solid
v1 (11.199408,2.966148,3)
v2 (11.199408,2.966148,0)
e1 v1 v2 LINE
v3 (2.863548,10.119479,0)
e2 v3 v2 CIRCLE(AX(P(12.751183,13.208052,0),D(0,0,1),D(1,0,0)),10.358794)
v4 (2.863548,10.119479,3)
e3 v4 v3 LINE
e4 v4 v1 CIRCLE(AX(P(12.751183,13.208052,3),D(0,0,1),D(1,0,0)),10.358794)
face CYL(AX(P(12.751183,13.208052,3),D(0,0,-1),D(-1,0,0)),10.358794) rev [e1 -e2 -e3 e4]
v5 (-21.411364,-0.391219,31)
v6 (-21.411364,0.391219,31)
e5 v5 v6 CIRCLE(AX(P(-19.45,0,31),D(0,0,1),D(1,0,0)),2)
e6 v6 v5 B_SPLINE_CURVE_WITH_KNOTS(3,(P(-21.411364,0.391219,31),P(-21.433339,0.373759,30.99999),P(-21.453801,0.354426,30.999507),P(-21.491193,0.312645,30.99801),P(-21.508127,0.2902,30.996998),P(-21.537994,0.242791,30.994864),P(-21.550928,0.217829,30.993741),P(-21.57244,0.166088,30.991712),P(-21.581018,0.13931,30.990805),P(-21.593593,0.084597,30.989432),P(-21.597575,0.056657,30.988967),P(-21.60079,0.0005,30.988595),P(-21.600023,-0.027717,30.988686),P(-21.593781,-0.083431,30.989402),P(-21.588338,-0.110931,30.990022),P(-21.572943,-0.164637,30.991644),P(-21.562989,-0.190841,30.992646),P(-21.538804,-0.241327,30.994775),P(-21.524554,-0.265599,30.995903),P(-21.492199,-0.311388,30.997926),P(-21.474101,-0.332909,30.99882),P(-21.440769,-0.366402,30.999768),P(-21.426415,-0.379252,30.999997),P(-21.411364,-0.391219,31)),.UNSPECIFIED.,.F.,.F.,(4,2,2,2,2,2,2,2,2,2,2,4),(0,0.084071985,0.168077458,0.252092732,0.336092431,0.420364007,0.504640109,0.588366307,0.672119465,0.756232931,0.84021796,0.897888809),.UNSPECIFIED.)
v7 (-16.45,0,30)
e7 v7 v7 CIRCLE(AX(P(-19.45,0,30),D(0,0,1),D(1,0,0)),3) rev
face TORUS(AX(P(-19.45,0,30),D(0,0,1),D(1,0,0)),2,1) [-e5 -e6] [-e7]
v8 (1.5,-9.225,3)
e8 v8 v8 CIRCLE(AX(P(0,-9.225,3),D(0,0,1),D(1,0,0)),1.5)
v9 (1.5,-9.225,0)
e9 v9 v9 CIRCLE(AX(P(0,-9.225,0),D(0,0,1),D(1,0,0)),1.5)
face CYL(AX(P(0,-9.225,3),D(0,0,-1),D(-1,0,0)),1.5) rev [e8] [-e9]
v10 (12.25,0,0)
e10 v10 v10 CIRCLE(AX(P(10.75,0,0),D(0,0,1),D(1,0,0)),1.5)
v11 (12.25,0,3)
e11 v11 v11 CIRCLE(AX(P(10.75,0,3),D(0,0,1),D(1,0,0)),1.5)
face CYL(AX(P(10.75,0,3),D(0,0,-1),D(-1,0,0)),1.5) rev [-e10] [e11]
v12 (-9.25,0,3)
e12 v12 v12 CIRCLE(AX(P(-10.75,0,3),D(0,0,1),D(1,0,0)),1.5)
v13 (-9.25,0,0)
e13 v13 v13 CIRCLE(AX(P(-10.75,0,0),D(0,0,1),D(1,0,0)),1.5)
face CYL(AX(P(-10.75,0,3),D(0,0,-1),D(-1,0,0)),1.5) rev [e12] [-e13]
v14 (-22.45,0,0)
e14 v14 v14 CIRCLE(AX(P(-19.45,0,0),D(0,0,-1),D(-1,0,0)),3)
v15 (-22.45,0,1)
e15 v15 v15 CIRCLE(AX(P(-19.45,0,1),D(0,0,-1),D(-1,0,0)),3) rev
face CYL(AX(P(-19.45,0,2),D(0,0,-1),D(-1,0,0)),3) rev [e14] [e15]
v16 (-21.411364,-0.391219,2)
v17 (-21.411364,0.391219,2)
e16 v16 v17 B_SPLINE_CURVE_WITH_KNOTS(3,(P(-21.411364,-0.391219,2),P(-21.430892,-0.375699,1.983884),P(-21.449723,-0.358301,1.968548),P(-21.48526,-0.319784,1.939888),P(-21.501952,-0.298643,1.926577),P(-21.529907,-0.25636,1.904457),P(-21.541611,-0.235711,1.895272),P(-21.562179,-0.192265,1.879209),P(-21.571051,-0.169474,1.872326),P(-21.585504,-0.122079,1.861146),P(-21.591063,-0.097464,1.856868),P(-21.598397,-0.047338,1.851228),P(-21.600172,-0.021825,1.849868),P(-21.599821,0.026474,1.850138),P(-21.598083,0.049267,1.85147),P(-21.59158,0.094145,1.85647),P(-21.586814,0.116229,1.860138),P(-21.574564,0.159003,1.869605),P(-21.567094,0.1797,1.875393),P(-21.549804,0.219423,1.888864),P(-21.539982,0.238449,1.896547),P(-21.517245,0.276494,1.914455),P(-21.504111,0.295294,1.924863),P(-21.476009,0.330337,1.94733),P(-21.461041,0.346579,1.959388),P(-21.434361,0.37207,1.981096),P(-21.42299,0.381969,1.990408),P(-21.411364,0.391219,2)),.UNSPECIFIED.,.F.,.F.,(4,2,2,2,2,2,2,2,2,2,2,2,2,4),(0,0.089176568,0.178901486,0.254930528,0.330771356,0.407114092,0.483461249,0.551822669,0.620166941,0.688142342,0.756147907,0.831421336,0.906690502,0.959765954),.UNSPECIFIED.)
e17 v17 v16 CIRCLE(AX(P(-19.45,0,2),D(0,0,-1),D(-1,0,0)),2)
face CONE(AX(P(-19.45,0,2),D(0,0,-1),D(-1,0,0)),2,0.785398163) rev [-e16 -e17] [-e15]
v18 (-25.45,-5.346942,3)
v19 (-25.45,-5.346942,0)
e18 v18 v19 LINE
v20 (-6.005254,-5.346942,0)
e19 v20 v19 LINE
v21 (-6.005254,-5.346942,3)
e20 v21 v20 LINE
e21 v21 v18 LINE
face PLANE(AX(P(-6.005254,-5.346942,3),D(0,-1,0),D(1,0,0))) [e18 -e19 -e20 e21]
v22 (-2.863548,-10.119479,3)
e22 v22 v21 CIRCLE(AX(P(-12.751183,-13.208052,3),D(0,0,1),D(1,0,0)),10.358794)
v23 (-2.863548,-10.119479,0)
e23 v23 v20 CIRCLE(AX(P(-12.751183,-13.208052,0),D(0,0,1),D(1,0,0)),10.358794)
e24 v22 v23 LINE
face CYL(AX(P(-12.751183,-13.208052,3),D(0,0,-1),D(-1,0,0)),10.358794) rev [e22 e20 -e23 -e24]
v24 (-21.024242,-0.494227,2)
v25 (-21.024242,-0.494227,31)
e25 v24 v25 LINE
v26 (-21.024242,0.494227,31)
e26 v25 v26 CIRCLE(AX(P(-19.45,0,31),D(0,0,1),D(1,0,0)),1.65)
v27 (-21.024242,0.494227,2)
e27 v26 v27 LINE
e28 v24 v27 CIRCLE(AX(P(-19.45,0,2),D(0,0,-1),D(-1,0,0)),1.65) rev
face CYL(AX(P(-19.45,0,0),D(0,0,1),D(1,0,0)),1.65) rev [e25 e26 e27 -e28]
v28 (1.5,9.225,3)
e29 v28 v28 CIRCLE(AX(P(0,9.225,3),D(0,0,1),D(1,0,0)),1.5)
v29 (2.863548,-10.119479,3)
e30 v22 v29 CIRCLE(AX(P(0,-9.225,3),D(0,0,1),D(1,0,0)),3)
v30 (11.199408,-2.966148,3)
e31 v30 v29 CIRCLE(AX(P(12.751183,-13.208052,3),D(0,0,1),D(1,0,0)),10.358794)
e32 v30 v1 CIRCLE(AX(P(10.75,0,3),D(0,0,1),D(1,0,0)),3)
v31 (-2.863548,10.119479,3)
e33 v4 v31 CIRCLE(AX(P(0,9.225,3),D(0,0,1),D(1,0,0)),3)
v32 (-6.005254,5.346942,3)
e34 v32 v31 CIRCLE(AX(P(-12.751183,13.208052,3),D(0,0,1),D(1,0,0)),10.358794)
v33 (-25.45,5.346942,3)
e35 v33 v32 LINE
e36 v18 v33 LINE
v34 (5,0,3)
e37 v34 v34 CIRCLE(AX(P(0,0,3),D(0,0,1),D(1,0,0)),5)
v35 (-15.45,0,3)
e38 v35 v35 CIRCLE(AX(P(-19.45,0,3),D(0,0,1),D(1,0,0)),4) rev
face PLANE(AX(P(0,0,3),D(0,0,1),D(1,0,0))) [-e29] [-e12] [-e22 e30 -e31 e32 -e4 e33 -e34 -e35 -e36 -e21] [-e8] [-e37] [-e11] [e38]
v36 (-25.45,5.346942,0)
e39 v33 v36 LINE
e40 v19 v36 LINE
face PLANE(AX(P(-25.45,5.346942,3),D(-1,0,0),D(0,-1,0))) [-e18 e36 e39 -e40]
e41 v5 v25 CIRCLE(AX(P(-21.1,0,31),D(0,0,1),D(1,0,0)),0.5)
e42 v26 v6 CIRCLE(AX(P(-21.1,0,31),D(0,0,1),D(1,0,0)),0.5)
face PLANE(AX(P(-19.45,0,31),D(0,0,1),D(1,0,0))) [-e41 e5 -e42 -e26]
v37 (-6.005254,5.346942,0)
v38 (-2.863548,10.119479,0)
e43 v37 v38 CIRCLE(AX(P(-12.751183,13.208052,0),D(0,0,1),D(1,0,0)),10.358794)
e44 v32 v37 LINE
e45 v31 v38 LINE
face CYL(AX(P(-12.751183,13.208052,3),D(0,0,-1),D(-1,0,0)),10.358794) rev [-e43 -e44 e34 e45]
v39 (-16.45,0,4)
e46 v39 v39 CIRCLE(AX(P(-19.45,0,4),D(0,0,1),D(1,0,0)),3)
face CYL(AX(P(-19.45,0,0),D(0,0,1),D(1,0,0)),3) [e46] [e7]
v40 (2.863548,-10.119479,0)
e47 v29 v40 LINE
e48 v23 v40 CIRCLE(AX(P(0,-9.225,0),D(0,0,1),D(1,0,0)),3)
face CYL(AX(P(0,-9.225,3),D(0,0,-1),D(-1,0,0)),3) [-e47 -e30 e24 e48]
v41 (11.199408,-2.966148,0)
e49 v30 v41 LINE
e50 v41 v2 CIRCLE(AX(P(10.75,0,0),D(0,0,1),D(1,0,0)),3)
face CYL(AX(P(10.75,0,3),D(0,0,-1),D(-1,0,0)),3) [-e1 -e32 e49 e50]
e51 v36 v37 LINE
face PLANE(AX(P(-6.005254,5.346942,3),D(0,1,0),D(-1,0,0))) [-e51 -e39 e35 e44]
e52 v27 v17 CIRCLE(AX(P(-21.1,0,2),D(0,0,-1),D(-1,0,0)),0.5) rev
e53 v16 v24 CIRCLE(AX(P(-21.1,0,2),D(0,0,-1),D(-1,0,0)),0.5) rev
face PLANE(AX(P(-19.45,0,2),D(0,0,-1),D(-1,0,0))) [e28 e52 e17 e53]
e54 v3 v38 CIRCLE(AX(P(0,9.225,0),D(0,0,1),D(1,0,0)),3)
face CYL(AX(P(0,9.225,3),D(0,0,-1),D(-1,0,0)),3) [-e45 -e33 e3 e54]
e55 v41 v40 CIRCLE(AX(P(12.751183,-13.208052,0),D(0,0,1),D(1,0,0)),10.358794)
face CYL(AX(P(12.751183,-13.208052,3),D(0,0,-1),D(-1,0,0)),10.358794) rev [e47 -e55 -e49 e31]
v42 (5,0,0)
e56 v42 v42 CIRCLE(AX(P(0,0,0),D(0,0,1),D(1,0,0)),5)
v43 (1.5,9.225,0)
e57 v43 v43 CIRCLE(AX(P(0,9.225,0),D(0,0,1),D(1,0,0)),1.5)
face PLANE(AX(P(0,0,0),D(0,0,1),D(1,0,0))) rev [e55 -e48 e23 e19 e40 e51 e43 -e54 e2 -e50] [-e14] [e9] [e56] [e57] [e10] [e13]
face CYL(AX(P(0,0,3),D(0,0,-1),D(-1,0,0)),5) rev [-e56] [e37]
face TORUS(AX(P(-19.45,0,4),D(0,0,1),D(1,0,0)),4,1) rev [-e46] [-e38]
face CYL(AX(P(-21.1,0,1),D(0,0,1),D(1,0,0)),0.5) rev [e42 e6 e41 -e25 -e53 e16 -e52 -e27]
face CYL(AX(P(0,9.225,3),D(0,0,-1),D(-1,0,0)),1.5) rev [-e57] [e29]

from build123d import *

# Parameters (mm, degrees)
SKETCH1_R                = 1.5
SKETCH1_R_2              = 5
SKETCH1_R_3              = 3
BOSS_EXTRUDE1_DEPTH      = 3
SKETCH2_W                = 19.444746102
SKETCH2_H                = 10.693884422
SKETCH2_R                = 3
SKETCH2_R_2              = 1.5
BOSS_EXTRUDE2_DEPTH      = 3
BOSS_EXTRUDE3_DEPTH      = 28
BOSS_EXTRUDE3_DEPTH_BACK = 3
SKETCH3_R                = 3
SKETCH3_R_2              = 1.65
SKETCH4_R                = 0.5
CUT_EXTRUDE1_DEPTH       = 30
SKETCH5_R                = 3
CUT_EXTRUDE2_DEPTH       = 2
CHAMFER1_SIZE            = 1
FILLET2_R                = 1
FILLET3_R                = 1


with BuildPart() as part:
    # Sketch1 → Boss-Extrude1 (new body)
    # profile 1 of 4: a face of its own
    with BuildSketch(Plane.XY):
        with BuildLine():
            ThreePointArc((2.863548114, 10.119478732), (2.965690842, 9.677413339), (3, 9.225))
            ThreePointArc((3, 9.225), (-0.452413339, 6.259309158), (-2.863548114, 10.119478732))
            ThreePointArc((-2.863548114, 10.119478732), (-6.005253898, 5.346942211), (-11.199408085, 2.966147733))
            ThreePointArc((-11.199408085, 2.966147733), (-8.794012303, 2.274667476), (-7.75, 0))
            ThreePointArc((-7.75, 0), (-8.794012303, -2.274667476), (-11.199408085, -2.966147733))
            ThreePointArc((-11.199408085, -2.966147733), (-6.005253898, -5.346942211), (-2.863548114, -10.119478732))
            ThreePointArc((-2.863548114, -10.119478732), (0, -12.225), (2.863548114, -10.119478732))
            ThreePointArc((2.863548114, -10.119478732), (6.005253898, -5.346942211), (11.199408085, -2.966147733))
            ThreePointArc((11.199408085, -2.966147733), (7.75, 0), (11.199408085, 2.966147733))
            ThreePointArc((11.199408085, 2.966147733), (6.005253898, 5.346942211), (2.863548114, 10.119478732))
        make_face()
        with Locations((0, -9.225)):
            Circle(SKETCH1_R, mode=Mode.SUBTRACT)
        Circle(SKETCH1_R_2, mode=Mode.SUBTRACT)
    # profile 2 of 4: a face of its own
    with BuildSketch(Plane.XY):
        with Locations((0, 9.225)):
            Circle(SKETCH1_R_3)
        with Locations((0, 9.225)):
            Circle(SKETCH1_R, mode=Mode.SUBTRACT)
    # profile 3 of 4: a face of its own
    with BuildSketch(Plane.XY):
        with Locations((-10.75, 0)):
            Circle(SKETCH1_R_3)
        with Locations((-10.75, 0)):
            Circle(SKETCH1_R, mode=Mode.SUBTRACT)
    # profile 4 of 4: a face of its own
    with BuildSketch(Plane.XY):
        with Locations((10.75, 0)):
            Circle(SKETCH1_R_3)
        with Locations((10.75, 0)):
            Circle(SKETCH1_R, mode=Mode.SUBTRACT)
    extrude(amount=BOSS_EXTRUDE1_DEPTH)

    # Sketch2 → Boss-Extrude2 (add, through all)
    with BuildSketch(Plane(origin=(0, 0, 0), x_dir=(-1, 0, 0), z_dir=(0, 0, -1))):
        with Locations((15.727626949, 0)):
            Rectangle(SKETCH2_W, SKETCH2_H)
        with Locations((19.45, 0)):
            Circle(SKETCH2_R, mode=Mode.SUBTRACT)
        with Locations(Location((10.75, 0, 0), (0, 0, 180))):
            Circle(SKETCH2_R_2, mode=Mode.SUBTRACT)
    extrude(amount=-BOSS_EXTRUDE2_DEPTH)

    # Sketch3 → Boss-Extrude3 (add, two sides: drawn at the far end of the back side and taken through both)
    with BuildSketch(Plane.XY.offset(3).offset(-BOSS_EXTRUDE3_DEPTH_BACK)):
        with Locations((-19.45, 0)):
            Circle(SKETCH3_R)
        with Locations((-19.45, 0)):
            Circle(SKETCH3_R_2, mode=Mode.SUBTRACT)
    extrude(amount=BOSS_EXTRUDE3_DEPTH + BOSS_EXTRUDE3_DEPTH_BACK)

    # Sketch4 → Cut-Extrude1 (cut)
    with BuildSketch(Plane.XY.offset(31)):
        with Locations((-21.1, 0)):
            Circle(SKETCH4_R)
    extrude(amount=-CUT_EXTRUDE1_DEPTH, mode=Mode.SUBTRACT)

    # Sketch5 → Cut-Extrude2 (cut)
    with BuildSketch(Plane(origin=(0, 0, 0), x_dir=(-1, 0, 0), z_dir=(0, 0, -1))):
        with Locations(Location((19.45, 0, 0), (0, 0, 180))):
            Circle(SKETCH5_R)
    extrude(amount=-CUT_EXTRUDE2_DEPTH, mode=Mode.SUBTRACT)

    # Chamfer1
    # the kernel refuses this chamfer: 1 mm, written as the material it adds along each edge
    with BuildSketch(Plane(origin=(-19.45, 0, 2), x_dir=(1, 0, 0), z_dir=(0, 1, 0))) as chamfer1_piece_1_section:
        Polygon((3 - CHAMFER1_SIZE, 0), (3, CHAMFER1_SIZE), (3, 0), align=None)
    chamfer1_piece_1 = revolve(axis=Axis((-19.45, 0, 2), (0, 0, -1)), mode=Mode.PRIVATE)
    chamfer1_piece_1 = chamfer1_piece_1 - Plane(origin=(-21.1, 0, 1.51482841), x_dir=(1, 0, 0), z_dir=(0, 0, 1)) * Cylinder(0.5, 12, mode=Mode.PRIVATE)
    add(chamfer1_piece_1)

    # Fillet2
    fillet2_edges = [part.edges().sort_by_distance(p)[0] for p in [
        (-22.45, 0, 3),
    ]]
    fillet(fillet2_edges, radius=FILLET2_R)

    # Fillet3
    # the kernel refuses this fillet: 1 mm, written as the material it takes off along each edge
    with BuildSketch(Plane(origin=(-19.45, 0, 31), x_dir=(1, 0, 0), z_dir=(0, -1, 0))) as fillet3_piece_1:
        with BuildLine():
            CenterArc((3 - FILLET3_R, -FILLET3_R), FILLET3_R, 0, 90)
            Line((3 - FILLET3_R, 0), (3, 0))
            Line((3, 0), (3, -FILLET3_R))
        make_face()
    revolve(axis=Axis((-19.45, 0, 31), (0, 0, 1)), mode=Mode.SUBTRACT)


solid = part.part
